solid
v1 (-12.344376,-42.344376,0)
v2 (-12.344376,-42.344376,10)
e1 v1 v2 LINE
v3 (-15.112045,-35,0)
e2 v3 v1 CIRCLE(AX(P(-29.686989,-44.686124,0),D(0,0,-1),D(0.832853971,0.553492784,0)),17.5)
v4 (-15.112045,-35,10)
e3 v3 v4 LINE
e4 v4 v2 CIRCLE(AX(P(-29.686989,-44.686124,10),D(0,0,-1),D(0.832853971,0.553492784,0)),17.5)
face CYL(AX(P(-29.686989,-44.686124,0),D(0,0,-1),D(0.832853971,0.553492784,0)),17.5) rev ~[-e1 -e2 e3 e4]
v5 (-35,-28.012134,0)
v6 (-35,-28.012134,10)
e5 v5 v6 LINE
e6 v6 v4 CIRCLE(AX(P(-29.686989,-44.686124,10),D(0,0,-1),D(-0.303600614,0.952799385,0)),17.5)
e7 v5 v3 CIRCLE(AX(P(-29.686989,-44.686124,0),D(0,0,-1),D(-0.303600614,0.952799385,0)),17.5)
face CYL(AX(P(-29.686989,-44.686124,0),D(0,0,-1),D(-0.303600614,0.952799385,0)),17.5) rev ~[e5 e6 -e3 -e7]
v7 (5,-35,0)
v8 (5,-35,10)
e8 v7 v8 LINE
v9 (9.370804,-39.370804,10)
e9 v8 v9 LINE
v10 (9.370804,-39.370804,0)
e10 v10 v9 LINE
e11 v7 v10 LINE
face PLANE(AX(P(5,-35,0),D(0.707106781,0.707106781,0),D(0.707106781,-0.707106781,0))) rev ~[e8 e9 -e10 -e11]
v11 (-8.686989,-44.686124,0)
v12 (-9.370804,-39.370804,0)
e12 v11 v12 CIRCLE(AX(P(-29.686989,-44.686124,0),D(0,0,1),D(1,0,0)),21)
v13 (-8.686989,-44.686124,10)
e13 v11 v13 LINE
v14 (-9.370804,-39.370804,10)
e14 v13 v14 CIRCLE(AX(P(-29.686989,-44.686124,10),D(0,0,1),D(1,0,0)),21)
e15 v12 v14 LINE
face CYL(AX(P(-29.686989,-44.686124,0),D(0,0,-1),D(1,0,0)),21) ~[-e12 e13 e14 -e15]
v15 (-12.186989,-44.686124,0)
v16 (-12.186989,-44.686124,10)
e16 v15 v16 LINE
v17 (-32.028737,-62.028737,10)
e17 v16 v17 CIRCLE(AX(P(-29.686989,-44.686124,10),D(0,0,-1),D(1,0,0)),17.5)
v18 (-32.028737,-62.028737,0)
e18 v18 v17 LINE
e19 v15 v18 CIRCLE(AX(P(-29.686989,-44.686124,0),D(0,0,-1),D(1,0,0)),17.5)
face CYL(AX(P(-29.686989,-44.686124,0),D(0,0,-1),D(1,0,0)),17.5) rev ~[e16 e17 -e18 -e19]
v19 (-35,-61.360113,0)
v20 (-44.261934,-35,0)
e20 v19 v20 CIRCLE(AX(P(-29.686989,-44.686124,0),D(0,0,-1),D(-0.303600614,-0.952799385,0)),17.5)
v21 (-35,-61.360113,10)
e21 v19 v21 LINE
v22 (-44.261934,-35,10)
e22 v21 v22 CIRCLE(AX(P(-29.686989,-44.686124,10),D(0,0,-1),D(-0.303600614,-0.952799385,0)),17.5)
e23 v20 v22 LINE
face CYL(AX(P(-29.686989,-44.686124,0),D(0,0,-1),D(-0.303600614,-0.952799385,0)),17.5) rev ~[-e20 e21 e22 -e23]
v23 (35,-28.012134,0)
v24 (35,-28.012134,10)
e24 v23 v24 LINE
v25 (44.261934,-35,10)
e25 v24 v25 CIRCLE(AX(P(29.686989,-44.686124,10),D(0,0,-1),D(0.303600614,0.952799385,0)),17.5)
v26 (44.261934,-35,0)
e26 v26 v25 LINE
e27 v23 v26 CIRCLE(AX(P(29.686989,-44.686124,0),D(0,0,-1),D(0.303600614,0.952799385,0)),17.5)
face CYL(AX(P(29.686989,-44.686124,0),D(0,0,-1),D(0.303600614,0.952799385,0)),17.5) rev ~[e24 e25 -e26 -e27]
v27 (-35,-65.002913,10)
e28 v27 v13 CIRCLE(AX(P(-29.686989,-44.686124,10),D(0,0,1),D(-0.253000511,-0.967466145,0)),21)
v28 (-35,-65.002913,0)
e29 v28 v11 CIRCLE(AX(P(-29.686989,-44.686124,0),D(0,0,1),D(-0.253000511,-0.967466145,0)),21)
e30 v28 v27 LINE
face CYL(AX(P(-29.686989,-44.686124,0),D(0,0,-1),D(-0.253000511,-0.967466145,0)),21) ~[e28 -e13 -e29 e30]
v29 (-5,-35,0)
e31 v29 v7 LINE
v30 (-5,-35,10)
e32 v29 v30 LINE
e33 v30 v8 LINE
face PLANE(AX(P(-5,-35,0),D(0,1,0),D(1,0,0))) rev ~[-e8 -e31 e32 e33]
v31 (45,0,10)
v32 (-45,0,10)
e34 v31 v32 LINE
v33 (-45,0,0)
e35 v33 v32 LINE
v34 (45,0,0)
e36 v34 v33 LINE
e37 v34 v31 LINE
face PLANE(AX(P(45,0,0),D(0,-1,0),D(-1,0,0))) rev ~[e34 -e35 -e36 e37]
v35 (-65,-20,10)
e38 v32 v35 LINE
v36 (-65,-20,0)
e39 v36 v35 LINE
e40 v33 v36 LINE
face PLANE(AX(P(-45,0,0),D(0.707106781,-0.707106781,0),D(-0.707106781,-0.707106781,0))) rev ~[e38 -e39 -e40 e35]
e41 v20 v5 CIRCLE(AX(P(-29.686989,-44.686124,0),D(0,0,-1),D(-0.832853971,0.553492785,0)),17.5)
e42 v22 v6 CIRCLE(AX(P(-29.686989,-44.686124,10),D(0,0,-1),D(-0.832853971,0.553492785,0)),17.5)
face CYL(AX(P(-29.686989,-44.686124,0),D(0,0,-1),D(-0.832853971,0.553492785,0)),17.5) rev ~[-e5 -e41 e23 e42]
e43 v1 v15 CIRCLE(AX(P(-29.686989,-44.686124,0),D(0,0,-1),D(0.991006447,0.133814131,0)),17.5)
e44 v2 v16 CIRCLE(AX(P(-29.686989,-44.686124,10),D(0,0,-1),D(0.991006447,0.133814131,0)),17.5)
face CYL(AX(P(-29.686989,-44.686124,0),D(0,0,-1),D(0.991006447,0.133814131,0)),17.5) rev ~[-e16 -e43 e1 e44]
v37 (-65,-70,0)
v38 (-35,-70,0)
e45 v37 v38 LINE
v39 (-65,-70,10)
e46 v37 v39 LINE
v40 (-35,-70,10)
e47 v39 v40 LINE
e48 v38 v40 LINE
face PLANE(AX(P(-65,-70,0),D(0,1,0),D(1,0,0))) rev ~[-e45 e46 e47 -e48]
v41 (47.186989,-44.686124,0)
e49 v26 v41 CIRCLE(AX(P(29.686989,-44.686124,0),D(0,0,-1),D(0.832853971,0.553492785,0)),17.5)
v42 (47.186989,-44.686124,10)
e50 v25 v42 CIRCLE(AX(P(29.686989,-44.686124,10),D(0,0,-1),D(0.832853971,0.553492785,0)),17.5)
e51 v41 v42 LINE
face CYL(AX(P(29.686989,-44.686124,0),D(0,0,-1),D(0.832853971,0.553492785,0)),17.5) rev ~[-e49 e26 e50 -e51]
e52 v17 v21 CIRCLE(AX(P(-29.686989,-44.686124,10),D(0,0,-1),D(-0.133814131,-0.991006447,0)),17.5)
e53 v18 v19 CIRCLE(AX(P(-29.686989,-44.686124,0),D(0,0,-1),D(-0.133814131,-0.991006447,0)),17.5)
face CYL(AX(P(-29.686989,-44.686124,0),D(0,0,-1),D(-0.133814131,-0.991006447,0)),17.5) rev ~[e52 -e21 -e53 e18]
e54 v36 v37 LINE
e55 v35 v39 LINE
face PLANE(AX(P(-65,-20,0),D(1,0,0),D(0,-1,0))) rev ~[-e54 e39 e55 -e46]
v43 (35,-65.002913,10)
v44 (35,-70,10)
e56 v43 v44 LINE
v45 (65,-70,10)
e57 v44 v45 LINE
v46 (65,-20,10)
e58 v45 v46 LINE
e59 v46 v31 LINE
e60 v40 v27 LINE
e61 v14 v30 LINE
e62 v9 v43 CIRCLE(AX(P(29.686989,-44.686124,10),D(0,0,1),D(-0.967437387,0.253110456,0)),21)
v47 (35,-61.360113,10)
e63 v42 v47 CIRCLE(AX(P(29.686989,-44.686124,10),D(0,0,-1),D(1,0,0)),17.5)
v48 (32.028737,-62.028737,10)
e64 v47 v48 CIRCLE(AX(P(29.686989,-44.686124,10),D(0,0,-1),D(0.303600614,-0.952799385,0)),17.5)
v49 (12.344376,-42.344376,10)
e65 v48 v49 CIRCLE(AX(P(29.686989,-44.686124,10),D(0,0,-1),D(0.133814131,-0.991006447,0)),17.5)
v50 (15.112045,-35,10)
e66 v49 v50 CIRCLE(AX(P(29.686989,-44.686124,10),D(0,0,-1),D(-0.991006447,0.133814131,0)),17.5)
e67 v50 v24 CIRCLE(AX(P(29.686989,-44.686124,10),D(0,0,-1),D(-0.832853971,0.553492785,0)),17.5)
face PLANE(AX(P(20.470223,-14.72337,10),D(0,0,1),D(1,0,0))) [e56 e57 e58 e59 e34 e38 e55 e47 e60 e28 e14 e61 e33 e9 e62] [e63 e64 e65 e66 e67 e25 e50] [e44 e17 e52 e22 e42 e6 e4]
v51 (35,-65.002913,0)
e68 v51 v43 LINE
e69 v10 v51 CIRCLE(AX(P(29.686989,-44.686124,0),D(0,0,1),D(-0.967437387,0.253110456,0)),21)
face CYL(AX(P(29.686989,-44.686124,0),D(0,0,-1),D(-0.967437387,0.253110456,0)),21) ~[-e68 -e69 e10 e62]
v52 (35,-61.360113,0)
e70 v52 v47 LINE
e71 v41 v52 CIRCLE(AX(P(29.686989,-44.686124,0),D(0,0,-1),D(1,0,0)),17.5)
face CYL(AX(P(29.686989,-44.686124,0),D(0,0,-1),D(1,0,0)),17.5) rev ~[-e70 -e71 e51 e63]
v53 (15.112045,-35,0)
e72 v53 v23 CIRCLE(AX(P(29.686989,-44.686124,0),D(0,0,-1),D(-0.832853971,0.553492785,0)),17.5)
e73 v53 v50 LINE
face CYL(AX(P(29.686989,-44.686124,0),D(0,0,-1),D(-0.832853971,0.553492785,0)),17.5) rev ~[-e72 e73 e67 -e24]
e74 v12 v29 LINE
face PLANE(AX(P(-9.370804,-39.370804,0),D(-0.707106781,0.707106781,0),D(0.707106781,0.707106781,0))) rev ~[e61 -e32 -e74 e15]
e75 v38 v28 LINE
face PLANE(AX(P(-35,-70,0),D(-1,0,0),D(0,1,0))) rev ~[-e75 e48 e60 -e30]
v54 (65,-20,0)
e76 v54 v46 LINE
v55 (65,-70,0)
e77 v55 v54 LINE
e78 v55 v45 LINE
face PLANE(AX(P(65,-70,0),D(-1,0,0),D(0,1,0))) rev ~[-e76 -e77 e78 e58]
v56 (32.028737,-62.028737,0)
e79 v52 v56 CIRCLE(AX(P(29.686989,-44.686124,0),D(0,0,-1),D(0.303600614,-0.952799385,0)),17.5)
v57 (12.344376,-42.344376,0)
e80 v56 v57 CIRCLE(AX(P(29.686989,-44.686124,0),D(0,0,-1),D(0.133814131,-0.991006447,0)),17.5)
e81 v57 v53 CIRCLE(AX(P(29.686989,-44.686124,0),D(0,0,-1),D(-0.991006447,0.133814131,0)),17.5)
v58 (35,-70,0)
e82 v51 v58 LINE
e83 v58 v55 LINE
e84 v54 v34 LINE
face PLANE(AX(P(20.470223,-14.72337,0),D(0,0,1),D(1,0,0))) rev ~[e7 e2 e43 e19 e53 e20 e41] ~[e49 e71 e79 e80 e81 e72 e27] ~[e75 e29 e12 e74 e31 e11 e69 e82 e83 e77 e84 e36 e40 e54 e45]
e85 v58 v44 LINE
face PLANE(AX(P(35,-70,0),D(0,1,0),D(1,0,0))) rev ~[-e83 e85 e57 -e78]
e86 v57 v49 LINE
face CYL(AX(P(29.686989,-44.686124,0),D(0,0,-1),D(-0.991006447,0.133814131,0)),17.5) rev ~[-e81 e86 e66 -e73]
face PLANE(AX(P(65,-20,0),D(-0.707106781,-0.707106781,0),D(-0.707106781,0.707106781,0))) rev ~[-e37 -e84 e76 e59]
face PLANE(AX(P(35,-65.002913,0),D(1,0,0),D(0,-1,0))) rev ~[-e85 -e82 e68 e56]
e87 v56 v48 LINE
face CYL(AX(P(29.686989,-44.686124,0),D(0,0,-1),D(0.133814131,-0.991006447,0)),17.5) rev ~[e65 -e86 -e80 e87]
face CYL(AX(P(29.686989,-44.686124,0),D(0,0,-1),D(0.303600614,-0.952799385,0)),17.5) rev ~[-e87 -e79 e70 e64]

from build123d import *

# Parameters (mm, degrees)
F1_DEPTH = 10


with BuildPart() as f1:
    # F0 (on Top) → F1 (new body)
    with BuildSketch(Plane.XY):
        with BuildLine():
            Line((45, 0), (0, 0))
            Line((0, 0), (0, -35))
            Line((0, -35), (5, -35))
            Line((5, -35), (11.0542490694, -35))
            ThreePointArc((11.0542490694, -35), (21.1660409917, -25.4925456214), (35, -24.3693346885))
            Line((35, -24.3693346885), (35, -20))
            Line((35, -20), (45, -20))
            Line((45, -20), (45, 0))
        make_face()
        with BuildLine():
            Line((0, -35), (0, 0))
            Line((0, 0), (-45, 0))
            Line((-45, 0), (-45, -20))
            Line((-45, -20), (-35, -20))
            Line((-35, -20), (-35, -24.3693346885))
            ThreePointArc((-35, -24.3693346885), (-21.1660409917, -25.4925456214), (-11.0542490694, -35))
            Line((-11.0542490694, -35), (-5, -35))
            Line((-5, -35), (0, -35))
        make_face()
        Polygon((65, -20), (45, 0), (45, -20), align=None)
        Polygon((-45, -20), (-45, 0), (-65, -20), align=None)
        with BuildLine():
            Line((65, -20), (45, -20))
            Line((45, -20), (45, -30.3156087011))
            ThreePointArc((45, -30.3156087011), (49.2135509862, -36.9586799562), (50.6869892627, -44.6861237288))
            ThreePointArc((50.6869892627, -44.6861237288), (46.3088607801, -57.5201950726), (35, -65.002912769))
            Line((35, -65.002912769), (35, -70))
            Line((35, -70), (65, -70))
            Line((65, -70), (65, -20))
        make_face()
        with BuildLine():
            Line((45, -30.3156087011), (45, -20))
            Line((45, -20), (35, -20))
            Line((35, -20), (35, -24.3693346885))
            ThreePointArc((35, -24.3693346885), (40.420009999, -26.6361302142), (45, -30.3156087011))
        make_face()
        with BuildLine():
            Line((11.0542490694, -35), (5, -35))
            Line((5, -35), (9.3708041453, -39.3708041453))
            ThreePointArc((9.3708041453, -39.3708041453), (10.0902885727, -37.1383212628), (11.0542490694, -35))
        make_face()
        with BuildLine():
            Line((-9.3708041453, -39.3708041453), (-5, -35))
            Line((-5, -35), (-11.0542490694, -35))
            ThreePointArc((-11.0542490694, -35), (-10.0902885727, -37.1383212628), (-9.3708041453, -39.3708041453))
        make_face()
        with BuildLine():
            Line((-35, -20), (-45, -20))
            Line((-45, -20), (-45, -30.3156087011))
            ThreePointArc((-45, -30.3156087011), (-40.420009999, -26.6361302142), (-35, -24.3693346885))
            Line((-35, -24.3693346885), (-35, -20))
        make_face()
        with BuildLine():
            Line((-45, -30.3156087011), (-45, -20))
            Line((-45, -20), (-65, -20))
            Line((-65, -20), (-65, -70))
            Line((-65, -70), (-35, -70))
            Line((-35, -70), (-35, -65.002912769))
            ThreePointArc((-35, -65.002912769), (-49.8652066354, -50.5033003341), (-45, -30.3156087011))
        make_face()
        with BuildLine():
            ThreePointArc((50.6869892627, -44.6861237288), (49.2135509862, -36.9586799562), (45, -30.3156087011))
            Line((45, -30.3156087011), (45, -35))
            Line((45, -35), (44.2619337604, -35))
            ThreePointArc((44.2619337604, -35), (46.439773042, -39.6270491449), (47.1869892627, -44.6861237288))
            ThreePointArc((47.1869892627, -44.6861237288), (43.815465612, -55.0126021241), (35, -61.3601129606))
            Line((35, -61.3601129606), (35, -65))
            Line((35, -65), (35, -65.002912769))
            ThreePointArc((35, -65.002912769), (46.3088607801, -57.5201950726), (50.6869892627, -44.6861237288))
        make_face()
        with BuildLine():
            Line((45, -35), (45, -30.3156087011))
            ThreePointArc((45, -30.3156087011), (40.420009999, -26.6361302142), (35, -24.3693346885))
            Line((35, -24.3693346885), (35, -28.0121344969))
            ThreePointArc((35, -28.0121344969), (40.2269255495, -30.7161651365), (44.2619337604, -35))
            Line((44.2619337604, -35), (45, -35))
        make_face()
        with BuildLine():
            ThreePointArc((35, -24.3693346885), (21.1660409917, -25.4925456214), (11.0542490694, -35))
            Line((11.0542490694, -35), (15.112044765, -35))
            ThreePointArc((15.112044765, -35), (23.8858324541, -28.1756246545), (35, -28.0121344969))
            Line((35, -28.0121344969), (35, -24.3693346885))
        make_face()
        with BuildLine():
            Line((15.112044765, -35), (11.0542490694, -35))
            ThreePointArc((11.0542490694, -35), (10.0902885727, -37.1383212628), (9.3708041453, -39.3708041453))
            Line((9.3708041453, -39.3708041453), (12.344376437, -42.344376437))
            ThreePointArc((12.344376437, -42.344376437), (13.311166148, -38.5150284196), (15.112044765, -35))
        make_face()
        with BuildLine():
            Line((12.344376437, -42.344376437), (9.3708041453, -39.3708041453))
            ThreePointArc((9.3708041453, -39.3708041453), (14.8369031184, -59.5345223463), (35, -65.002912769))
            Line((35, -65.002912769), (35, -65))
            Line((35, -65), (32.0287365544, -62.0287365544))
            ThreePointArc((32.0287365544, -62.0287365544), (17.3126205919, -57.0604923995), (12.344376437, -42.344376437))
        make_face()
        with BuildLine():
            Line((-12.344376437, -42.344376437), (-9.3708041453, -39.3708041453))
            ThreePointArc((-9.3708041453, -39.3708041453), (-10.0902885727, -37.1383212628), (-11.0542490694, -35))
            Line((-11.0542490694, -35), (-15.112044765, -35))
            ThreePointArc((-15.112044765, -35), (-13.311166148, -38.5150284196), (-12.344376437, -42.344376437))
        make_face()
        with BuildLine():
            ThreePointArc((-8.6869892627, -44.6861237288), (-8.8586445437, -42.006561028), (-9.3708041453, -39.3708041453))
            Line((-9.3708041453, -39.3708041453), (-12.344376437, -42.344376437))
            ThreePointArc((-12.344376437, -42.344376437), (-12.2263803894, -43.5126085924), (-12.1869892627, -44.6861237288))
            ThreePointArc((-12.1869892627, -44.6861237288), (-18.1702748355, -57.8624391774), (-32.0287365544, -62.0287365544))
            Line((-32.0287365544, -62.0287365544), (-35, -65))
            Line((-35, -65), (-35, -65.002912769))
            ThreePointArc((-35, -65.002912769), (-16.8529179189, -61.3079952462), (-8.6869892627, -44.6861237288))
        make_face()
        with BuildLine():
            Line((-15.112044765, -35), (-11.0542490694, -35))
            ThreePointArc((-11.0542490694, -35), (-21.1660409917, -25.4925456214), (-35, -24.3693346885))
            Line((-35, -24.3693346885), (-35, -28.0121344969))
            ThreePointArc((-35, -28.0121344969), (-23.8858324541, -28.1756246545), (-15.112044765, -35))
        make_face()
        with BuildLine():
            ThreePointArc((-35, -24.3693346885), (-40.420009999, -26.6361302142), (-45, -30.3156087011))
            Line((-45, -30.3156087011), (-45, -35))
            Line((-45, -35), (-44.2619337604, -35))
            ThreePointArc((-44.2619337604, -35), (-40.2269255495, -30.7161651365), (-35, -28.0121344969))
            Line((-35, -28.0121344969), (-35, -24.3693346885))
        make_face()
        with BuildLine():
            Line((-45, -35), (-45, -30.3156087011))
            ThreePointArc((-45, -30.3156087011), (-49.8652066354, -50.5033003341), (-35, -65.002912769))
            Line((-35, -65.002912769), (-35, -65))
            Line((-35, -65), (-35, -61.3601129606))
            ThreePointArc((-35, -61.3601129606), (-46.197488337, -50.4872805374), (-44.2619337604, -35))
            Line((-44.2619337604, -35), (-45, -35))
        make_face()
        with BuildLine():
            ThreePointArc((35, -61.3601129606), (33.5289411752, -61.7591845411), (32.0287365544, -62.0287365544))
            Line((32.0287365544, -62.0287365544), (35, -65))
            Line((35, -65), (35, -61.3601129606))
        make_face()
        with BuildLine():
            Line((-35, -65), (-32.0287365544, -62.0287365544))
            ThreePointArc((-32.0287365544, -62.0287365544), (-33.5289411752, -61.7591845411), (-35, -61.3601129606))
            Line((-35, -61.3601129606), (-35, -65))
        make_face()
    extrude(amount=F1_DEPTH)


solid = f1.part
